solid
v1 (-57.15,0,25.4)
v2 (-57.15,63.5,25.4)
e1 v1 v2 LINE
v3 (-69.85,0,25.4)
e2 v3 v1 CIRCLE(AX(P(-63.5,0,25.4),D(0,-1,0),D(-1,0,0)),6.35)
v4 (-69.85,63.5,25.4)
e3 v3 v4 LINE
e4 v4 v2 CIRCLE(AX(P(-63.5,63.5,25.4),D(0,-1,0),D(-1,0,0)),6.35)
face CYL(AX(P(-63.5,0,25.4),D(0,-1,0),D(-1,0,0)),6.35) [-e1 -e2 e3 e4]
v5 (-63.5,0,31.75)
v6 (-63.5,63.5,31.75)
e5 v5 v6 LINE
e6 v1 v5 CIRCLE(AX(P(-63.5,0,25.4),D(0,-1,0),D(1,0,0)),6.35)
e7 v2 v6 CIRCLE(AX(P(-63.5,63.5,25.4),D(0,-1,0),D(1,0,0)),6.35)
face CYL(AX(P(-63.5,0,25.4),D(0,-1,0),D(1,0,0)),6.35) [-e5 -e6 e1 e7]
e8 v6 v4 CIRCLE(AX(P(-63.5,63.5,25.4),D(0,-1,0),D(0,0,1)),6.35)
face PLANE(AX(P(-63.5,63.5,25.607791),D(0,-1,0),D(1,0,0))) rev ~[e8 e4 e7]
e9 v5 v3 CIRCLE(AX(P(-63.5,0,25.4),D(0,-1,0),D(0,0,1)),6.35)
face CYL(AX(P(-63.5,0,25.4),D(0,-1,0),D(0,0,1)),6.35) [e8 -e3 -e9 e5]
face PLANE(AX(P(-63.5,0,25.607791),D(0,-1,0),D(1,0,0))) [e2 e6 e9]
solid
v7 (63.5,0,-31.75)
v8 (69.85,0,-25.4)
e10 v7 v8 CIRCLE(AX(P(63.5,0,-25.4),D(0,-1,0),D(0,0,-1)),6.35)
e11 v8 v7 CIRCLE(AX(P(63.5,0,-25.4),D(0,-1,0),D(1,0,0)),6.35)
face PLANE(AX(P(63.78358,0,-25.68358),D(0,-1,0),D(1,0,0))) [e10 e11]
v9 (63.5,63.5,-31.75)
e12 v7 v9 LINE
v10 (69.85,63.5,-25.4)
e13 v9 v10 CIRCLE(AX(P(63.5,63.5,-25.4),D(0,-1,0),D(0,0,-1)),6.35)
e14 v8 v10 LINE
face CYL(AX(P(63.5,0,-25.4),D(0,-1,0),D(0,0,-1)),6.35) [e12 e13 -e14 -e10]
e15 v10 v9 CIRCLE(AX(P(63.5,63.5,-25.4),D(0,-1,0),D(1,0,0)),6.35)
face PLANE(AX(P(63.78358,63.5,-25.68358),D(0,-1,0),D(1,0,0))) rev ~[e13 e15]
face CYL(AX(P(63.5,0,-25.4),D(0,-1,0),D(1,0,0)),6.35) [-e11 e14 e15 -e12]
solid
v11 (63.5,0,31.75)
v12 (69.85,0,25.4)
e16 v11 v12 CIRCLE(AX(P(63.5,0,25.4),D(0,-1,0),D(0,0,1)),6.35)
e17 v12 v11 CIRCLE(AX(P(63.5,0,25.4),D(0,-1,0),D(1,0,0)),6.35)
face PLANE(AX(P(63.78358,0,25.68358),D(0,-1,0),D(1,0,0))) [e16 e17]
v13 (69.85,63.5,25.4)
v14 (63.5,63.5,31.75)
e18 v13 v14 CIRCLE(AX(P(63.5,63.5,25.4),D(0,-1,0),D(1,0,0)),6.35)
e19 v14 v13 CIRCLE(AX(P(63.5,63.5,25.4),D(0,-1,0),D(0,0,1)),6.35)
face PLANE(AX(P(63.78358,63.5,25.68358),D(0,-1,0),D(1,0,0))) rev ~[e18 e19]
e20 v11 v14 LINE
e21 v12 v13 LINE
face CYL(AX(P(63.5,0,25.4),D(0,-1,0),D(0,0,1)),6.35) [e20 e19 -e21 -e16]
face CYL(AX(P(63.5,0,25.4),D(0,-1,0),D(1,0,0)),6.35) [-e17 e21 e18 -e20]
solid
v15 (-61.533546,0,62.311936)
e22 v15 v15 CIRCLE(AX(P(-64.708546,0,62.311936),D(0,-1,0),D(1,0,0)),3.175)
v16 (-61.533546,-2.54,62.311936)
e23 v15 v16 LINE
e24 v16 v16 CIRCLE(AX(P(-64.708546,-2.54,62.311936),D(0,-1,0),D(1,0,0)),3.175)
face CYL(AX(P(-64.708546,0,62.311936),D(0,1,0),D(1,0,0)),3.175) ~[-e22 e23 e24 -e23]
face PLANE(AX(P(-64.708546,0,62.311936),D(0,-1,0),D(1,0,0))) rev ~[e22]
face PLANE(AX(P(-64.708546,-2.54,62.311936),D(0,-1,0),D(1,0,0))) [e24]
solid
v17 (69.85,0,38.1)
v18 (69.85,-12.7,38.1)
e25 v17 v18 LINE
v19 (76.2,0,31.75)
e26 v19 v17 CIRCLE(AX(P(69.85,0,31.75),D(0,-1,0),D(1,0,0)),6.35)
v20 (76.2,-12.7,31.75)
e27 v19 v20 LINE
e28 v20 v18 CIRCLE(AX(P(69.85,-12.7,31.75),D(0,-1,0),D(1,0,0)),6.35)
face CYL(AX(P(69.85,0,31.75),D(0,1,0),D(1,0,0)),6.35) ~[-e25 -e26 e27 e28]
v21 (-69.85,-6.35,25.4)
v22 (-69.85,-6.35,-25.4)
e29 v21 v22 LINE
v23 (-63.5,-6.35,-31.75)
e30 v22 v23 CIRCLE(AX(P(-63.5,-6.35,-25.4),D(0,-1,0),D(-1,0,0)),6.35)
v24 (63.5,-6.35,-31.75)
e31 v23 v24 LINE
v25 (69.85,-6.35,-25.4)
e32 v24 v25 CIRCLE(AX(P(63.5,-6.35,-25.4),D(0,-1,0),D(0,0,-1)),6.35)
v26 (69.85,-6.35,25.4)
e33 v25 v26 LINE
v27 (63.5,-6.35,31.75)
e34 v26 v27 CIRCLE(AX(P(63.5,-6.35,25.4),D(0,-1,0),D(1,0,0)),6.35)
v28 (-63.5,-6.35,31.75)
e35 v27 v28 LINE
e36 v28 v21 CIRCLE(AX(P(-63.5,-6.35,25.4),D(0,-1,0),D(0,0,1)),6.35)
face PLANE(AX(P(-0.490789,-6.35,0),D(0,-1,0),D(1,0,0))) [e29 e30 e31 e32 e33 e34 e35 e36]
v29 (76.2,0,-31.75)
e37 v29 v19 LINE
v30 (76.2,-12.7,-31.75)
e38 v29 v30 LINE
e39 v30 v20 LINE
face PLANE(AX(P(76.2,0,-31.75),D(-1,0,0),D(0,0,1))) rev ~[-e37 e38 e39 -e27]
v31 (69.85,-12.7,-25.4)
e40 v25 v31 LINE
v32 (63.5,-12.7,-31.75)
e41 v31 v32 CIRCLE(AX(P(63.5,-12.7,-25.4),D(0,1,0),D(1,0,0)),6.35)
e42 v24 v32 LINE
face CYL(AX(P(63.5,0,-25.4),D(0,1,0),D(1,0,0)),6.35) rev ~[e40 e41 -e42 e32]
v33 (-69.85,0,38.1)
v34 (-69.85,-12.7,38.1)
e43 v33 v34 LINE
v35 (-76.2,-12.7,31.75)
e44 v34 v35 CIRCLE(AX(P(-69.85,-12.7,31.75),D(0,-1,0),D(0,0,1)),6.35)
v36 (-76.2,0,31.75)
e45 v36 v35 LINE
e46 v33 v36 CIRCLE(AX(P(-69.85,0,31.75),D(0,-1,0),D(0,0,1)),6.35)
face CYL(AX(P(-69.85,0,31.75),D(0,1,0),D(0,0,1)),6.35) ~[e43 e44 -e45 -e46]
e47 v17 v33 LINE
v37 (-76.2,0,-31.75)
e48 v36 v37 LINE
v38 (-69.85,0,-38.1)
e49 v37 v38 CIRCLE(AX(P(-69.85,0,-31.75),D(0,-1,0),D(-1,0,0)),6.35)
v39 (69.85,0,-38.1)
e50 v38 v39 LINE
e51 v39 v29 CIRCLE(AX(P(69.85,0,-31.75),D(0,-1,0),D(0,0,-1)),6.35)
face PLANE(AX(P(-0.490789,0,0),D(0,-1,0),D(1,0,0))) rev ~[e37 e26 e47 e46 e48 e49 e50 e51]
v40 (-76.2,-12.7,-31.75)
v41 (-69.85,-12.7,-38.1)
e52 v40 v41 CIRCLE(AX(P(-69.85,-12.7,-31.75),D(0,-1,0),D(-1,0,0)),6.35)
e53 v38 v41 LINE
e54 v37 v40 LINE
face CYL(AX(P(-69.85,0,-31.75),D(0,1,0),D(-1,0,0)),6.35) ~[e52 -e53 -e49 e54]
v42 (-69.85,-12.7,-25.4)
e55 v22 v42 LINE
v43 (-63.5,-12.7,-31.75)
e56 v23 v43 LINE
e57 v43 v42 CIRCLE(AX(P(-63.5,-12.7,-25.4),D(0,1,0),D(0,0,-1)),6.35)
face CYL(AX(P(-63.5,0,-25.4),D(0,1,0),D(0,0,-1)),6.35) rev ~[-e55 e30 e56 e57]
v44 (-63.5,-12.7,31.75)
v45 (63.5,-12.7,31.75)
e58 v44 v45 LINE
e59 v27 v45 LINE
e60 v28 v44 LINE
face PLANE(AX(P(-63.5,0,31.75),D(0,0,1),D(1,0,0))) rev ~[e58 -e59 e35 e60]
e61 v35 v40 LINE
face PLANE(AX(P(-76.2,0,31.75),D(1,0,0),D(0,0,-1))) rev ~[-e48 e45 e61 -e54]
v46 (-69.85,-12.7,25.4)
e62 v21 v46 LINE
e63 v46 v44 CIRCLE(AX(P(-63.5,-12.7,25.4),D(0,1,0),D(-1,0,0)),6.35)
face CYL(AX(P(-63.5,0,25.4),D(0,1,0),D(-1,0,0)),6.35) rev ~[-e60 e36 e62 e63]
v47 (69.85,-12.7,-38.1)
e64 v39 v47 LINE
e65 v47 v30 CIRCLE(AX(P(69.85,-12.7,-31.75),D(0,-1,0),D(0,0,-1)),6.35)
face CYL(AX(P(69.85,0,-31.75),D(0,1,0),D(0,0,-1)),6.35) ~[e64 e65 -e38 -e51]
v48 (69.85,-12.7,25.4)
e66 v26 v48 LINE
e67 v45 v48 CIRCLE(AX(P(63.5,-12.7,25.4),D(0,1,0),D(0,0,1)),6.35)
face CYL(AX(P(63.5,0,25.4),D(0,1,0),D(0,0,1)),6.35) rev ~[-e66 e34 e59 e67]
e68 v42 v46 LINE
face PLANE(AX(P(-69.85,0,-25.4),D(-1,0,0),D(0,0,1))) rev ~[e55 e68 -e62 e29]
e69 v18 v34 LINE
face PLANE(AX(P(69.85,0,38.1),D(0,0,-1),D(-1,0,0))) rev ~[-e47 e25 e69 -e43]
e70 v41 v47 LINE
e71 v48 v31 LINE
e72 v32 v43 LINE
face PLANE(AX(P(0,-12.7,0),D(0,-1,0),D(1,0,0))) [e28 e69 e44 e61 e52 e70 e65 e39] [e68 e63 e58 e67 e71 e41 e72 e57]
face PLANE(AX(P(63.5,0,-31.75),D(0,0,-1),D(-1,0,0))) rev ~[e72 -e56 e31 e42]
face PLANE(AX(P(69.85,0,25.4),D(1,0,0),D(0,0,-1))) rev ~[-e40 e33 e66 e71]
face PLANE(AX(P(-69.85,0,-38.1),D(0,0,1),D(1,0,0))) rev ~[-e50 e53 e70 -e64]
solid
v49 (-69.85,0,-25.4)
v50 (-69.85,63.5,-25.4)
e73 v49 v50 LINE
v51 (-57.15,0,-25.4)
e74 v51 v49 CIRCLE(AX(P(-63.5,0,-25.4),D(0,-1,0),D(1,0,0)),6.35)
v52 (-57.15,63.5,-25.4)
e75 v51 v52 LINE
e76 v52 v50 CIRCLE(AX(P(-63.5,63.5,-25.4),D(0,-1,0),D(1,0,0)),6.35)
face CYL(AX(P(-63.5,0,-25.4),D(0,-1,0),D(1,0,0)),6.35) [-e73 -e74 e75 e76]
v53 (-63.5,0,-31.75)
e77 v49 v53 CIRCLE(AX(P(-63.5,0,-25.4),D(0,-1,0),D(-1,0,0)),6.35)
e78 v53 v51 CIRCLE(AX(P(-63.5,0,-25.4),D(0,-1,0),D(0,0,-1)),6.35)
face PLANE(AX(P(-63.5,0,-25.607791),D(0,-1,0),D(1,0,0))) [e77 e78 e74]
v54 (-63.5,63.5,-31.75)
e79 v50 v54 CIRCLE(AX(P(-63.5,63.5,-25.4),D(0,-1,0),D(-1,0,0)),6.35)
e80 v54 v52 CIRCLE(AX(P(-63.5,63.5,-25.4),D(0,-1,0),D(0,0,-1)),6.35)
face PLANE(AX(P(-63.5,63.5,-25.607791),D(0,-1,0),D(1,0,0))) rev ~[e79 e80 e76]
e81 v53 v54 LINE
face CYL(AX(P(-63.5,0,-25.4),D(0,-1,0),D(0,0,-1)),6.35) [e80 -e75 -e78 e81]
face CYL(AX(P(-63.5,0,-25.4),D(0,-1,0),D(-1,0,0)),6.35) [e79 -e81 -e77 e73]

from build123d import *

# Parameters (mm, degrees)
F1_DEPTH = 12.7
F2_DEPTH = 63.5
F3_DEPTH = 6.35
F4_R     = 3.175
F5_DEPTH = 2.54


with BuildPart() as f1:
    # F0 (on Front) → F1 (new body)
    with BuildSketch(Plane.XZ):
        with BuildLine():
            Line((69.85, 38.1), (-69.85, 38.1))
            ThreePointArc((-69.85, 38.1), (-74.3401280605, 36.2401280605), (-76.2, 31.75))
            Line((-76.2, 31.75), (-76.2, -31.75))
            ThreePointArc((-76.2, -31.75), (-74.3401280605, -36.2401280605), (-69.85, -38.1))
            Line((-69.85, -38.1), (69.85, -38.1))
            ThreePointArc((69.85, -38.1), (74.3401280605, -36.2401280605), (76.2, -31.75))
            Line((76.2, -31.75), (76.2, 31.75))
            ThreePointArc((76.2, 31.75), (74.3401280605, 36.2401280605), (69.85, 38.1))
        make_face()
        with BuildLine():
            ThreePointArc((-69.85, 25.4), (-67.9901280605, 29.8901280605), (-63.5, 31.75))
            Line((-63.5, 31.75), (63.5, 31.75))
            ThreePointArc((63.5, 31.75), (67.9901280605, 29.8901280605), (69.85, 25.4))
            Line((69.85, 25.4), (69.85, -25.4))
            ThreePointArc((69.85, -25.4), (67.9901280605, -29.8901280605), (63.5, -31.75))
            Line((63.5, -31.75), (-63.5, -31.75))
            ThreePointArc((-63.5, -31.75), (-67.9901280605, -29.8901280605), (-69.85, -25.4))
            Line((-69.85, -25.4), (-69.85, 25.4))
        make_face(mode=Mode.SUBTRACT)
    extrude(amount=F1_DEPTH)

    # F0 (on Front) → F3 (join)
    with BuildSketch(Plane.XZ):
        with BuildLine():
            Line((63.5, 31.75), (-63.5, 31.75))
            ThreePointArc((-63.5, 31.75), (-59.0098719395, 29.8901280605), (-57.15, 25.4))
            ThreePointArc((-57.15, 25.4), (-63.5, 19.05), (-69.85, 25.4))
            Line((-69.85, 25.4), (-69.85, -25.4))
            ThreePointArc((-69.85, -25.4), (-63.5, -19.05), (-57.15, -25.4))
            ThreePointArc((-57.15, -25.4), (-59.0098719395, -29.8901280605), (-63.5, -31.75))
            Line((-63.5, -31.75), (63.5, -31.75))
            ThreePointArc((63.5, -31.75), (59.0098719395, -20.9098719395), (69.85, -25.4))
            Line((69.85, -25.4), (69.85, 25.4))
            ThreePointArc((69.85, 25.4), (59.0098719395, 20.9098719395), (63.5, 31.75))
        make_face()
        with BuildLine():
            ThreePointArc((-57.15, 25.4), (-59.0098719395, 29.8901280605), (-63.5, 31.75))
            ThreePointArc((-63.5, 31.75), (-67.9901280605, 29.8901280605), (-69.85, 25.4))
            ThreePointArc((-69.85, 25.4), (-63.5, 19.05), (-57.15, 25.4))
        make_face()
        with BuildLine():
            ThreePointArc((69.85, 25.4), (67.9901280605, 29.8901280605), (63.5, 31.75))
            ThreePointArc((63.5, 31.75), (59.0098719395, 20.9098719395), (69.85, 25.4))
        make_face()
        with BuildLine():
            ThreePointArc((63.5, -31.75), (67.9901280605, -29.8901280605), (69.85, -25.4))
            ThreePointArc((69.85, -25.4), (59.0098719395, -20.9098719395), (63.5, -31.75))
        make_face()
        with BuildLine():
            ThreePointArc((-57.15, -25.4), (-63.5, -19.05), (-69.85, -25.4))
            ThreePointArc((-69.85, -25.4), (-67.9901280605, -29.8901280605), (-63.5, -31.75))
            ThreePointArc((-63.5, -31.75), (-59.0098719395, -29.8901280605), (-57.15, -25.4))
        make_face()
    extrude(amount=F3_DEPTH)


with BuildPart() as f2:
    # F0 (on Front) → F2 (new body)
    with BuildSketch(Plane.XZ):
        with BuildLine():
            ThreePointArc((-57.15, 25.4), (-59.0098719395, 29.8901280605), (-63.5, 31.75))
            ThreePointArc((-63.5, 31.75), (-67.9901280605, 29.8901280605), (-69.85, 25.4))
            ThreePointArc((-69.85, 25.4), (-63.5, 19.05), (-57.15, 25.4))
        make_face()
    extrude(amount=-F2_DEPTH)


with BuildPart() as f2b:
    # F0 (on Front) → F2, piece 2 (new body)
    with BuildSketch(Plane.XZ):
        with BuildLine():
            ThreePointArc((-57.15, -25.4), (-63.5, -19.05), (-69.85, -25.4))
            ThreePointArc((-69.85, -25.4), (-67.9901280605, -29.8901280605), (-63.5, -31.75))
            ThreePointArc((-63.5, -31.75), (-59.0098719395, -29.8901280605), (-57.15, -25.4))
        make_face()
    extrude(amount=-F2_DEPTH)


with BuildPart() as f2c:
    # F0 (on Front) → F2, piece 3 (new body)
    with BuildSketch(Plane.XZ):
        with BuildLine():
            ThreePointArc((63.5, -31.75), (67.9901280605, -29.8901280605), (69.85, -25.4))
            ThreePointArc((69.85, -25.4), (59.0098719395, -20.9098719395), (63.5, -31.75))
        make_face()
    extrude(amount=-F2_DEPTH)


with BuildPart() as f2d:
    # F0 (on Front) → F2, piece 4 (new body)
    with BuildSketch(Plane.XZ):
        with BuildLine():
            ThreePointArc((69.85, 25.4), (67.9901280605, 29.8901280605), (63.5, 31.75))
            ThreePointArc((63.5, 31.75), (59.0098719395, 20.9098719395), (69.85, 25.4))
        make_face()
    extrude(amount=-F2_DEPTH)


with BuildPart() as f5:
    # F4 (on Front) → F5 (new body)
    with BuildSketch(Plane.XZ):
        with Locations((-64.708545804, 62.3119361699)):
            Circle(F4_R)
    extrude(amount=F5_DEPTH)


solid = Compound([f1.part, f2.part, f2b.part, f2c.part, f2d.part, f5.part])
